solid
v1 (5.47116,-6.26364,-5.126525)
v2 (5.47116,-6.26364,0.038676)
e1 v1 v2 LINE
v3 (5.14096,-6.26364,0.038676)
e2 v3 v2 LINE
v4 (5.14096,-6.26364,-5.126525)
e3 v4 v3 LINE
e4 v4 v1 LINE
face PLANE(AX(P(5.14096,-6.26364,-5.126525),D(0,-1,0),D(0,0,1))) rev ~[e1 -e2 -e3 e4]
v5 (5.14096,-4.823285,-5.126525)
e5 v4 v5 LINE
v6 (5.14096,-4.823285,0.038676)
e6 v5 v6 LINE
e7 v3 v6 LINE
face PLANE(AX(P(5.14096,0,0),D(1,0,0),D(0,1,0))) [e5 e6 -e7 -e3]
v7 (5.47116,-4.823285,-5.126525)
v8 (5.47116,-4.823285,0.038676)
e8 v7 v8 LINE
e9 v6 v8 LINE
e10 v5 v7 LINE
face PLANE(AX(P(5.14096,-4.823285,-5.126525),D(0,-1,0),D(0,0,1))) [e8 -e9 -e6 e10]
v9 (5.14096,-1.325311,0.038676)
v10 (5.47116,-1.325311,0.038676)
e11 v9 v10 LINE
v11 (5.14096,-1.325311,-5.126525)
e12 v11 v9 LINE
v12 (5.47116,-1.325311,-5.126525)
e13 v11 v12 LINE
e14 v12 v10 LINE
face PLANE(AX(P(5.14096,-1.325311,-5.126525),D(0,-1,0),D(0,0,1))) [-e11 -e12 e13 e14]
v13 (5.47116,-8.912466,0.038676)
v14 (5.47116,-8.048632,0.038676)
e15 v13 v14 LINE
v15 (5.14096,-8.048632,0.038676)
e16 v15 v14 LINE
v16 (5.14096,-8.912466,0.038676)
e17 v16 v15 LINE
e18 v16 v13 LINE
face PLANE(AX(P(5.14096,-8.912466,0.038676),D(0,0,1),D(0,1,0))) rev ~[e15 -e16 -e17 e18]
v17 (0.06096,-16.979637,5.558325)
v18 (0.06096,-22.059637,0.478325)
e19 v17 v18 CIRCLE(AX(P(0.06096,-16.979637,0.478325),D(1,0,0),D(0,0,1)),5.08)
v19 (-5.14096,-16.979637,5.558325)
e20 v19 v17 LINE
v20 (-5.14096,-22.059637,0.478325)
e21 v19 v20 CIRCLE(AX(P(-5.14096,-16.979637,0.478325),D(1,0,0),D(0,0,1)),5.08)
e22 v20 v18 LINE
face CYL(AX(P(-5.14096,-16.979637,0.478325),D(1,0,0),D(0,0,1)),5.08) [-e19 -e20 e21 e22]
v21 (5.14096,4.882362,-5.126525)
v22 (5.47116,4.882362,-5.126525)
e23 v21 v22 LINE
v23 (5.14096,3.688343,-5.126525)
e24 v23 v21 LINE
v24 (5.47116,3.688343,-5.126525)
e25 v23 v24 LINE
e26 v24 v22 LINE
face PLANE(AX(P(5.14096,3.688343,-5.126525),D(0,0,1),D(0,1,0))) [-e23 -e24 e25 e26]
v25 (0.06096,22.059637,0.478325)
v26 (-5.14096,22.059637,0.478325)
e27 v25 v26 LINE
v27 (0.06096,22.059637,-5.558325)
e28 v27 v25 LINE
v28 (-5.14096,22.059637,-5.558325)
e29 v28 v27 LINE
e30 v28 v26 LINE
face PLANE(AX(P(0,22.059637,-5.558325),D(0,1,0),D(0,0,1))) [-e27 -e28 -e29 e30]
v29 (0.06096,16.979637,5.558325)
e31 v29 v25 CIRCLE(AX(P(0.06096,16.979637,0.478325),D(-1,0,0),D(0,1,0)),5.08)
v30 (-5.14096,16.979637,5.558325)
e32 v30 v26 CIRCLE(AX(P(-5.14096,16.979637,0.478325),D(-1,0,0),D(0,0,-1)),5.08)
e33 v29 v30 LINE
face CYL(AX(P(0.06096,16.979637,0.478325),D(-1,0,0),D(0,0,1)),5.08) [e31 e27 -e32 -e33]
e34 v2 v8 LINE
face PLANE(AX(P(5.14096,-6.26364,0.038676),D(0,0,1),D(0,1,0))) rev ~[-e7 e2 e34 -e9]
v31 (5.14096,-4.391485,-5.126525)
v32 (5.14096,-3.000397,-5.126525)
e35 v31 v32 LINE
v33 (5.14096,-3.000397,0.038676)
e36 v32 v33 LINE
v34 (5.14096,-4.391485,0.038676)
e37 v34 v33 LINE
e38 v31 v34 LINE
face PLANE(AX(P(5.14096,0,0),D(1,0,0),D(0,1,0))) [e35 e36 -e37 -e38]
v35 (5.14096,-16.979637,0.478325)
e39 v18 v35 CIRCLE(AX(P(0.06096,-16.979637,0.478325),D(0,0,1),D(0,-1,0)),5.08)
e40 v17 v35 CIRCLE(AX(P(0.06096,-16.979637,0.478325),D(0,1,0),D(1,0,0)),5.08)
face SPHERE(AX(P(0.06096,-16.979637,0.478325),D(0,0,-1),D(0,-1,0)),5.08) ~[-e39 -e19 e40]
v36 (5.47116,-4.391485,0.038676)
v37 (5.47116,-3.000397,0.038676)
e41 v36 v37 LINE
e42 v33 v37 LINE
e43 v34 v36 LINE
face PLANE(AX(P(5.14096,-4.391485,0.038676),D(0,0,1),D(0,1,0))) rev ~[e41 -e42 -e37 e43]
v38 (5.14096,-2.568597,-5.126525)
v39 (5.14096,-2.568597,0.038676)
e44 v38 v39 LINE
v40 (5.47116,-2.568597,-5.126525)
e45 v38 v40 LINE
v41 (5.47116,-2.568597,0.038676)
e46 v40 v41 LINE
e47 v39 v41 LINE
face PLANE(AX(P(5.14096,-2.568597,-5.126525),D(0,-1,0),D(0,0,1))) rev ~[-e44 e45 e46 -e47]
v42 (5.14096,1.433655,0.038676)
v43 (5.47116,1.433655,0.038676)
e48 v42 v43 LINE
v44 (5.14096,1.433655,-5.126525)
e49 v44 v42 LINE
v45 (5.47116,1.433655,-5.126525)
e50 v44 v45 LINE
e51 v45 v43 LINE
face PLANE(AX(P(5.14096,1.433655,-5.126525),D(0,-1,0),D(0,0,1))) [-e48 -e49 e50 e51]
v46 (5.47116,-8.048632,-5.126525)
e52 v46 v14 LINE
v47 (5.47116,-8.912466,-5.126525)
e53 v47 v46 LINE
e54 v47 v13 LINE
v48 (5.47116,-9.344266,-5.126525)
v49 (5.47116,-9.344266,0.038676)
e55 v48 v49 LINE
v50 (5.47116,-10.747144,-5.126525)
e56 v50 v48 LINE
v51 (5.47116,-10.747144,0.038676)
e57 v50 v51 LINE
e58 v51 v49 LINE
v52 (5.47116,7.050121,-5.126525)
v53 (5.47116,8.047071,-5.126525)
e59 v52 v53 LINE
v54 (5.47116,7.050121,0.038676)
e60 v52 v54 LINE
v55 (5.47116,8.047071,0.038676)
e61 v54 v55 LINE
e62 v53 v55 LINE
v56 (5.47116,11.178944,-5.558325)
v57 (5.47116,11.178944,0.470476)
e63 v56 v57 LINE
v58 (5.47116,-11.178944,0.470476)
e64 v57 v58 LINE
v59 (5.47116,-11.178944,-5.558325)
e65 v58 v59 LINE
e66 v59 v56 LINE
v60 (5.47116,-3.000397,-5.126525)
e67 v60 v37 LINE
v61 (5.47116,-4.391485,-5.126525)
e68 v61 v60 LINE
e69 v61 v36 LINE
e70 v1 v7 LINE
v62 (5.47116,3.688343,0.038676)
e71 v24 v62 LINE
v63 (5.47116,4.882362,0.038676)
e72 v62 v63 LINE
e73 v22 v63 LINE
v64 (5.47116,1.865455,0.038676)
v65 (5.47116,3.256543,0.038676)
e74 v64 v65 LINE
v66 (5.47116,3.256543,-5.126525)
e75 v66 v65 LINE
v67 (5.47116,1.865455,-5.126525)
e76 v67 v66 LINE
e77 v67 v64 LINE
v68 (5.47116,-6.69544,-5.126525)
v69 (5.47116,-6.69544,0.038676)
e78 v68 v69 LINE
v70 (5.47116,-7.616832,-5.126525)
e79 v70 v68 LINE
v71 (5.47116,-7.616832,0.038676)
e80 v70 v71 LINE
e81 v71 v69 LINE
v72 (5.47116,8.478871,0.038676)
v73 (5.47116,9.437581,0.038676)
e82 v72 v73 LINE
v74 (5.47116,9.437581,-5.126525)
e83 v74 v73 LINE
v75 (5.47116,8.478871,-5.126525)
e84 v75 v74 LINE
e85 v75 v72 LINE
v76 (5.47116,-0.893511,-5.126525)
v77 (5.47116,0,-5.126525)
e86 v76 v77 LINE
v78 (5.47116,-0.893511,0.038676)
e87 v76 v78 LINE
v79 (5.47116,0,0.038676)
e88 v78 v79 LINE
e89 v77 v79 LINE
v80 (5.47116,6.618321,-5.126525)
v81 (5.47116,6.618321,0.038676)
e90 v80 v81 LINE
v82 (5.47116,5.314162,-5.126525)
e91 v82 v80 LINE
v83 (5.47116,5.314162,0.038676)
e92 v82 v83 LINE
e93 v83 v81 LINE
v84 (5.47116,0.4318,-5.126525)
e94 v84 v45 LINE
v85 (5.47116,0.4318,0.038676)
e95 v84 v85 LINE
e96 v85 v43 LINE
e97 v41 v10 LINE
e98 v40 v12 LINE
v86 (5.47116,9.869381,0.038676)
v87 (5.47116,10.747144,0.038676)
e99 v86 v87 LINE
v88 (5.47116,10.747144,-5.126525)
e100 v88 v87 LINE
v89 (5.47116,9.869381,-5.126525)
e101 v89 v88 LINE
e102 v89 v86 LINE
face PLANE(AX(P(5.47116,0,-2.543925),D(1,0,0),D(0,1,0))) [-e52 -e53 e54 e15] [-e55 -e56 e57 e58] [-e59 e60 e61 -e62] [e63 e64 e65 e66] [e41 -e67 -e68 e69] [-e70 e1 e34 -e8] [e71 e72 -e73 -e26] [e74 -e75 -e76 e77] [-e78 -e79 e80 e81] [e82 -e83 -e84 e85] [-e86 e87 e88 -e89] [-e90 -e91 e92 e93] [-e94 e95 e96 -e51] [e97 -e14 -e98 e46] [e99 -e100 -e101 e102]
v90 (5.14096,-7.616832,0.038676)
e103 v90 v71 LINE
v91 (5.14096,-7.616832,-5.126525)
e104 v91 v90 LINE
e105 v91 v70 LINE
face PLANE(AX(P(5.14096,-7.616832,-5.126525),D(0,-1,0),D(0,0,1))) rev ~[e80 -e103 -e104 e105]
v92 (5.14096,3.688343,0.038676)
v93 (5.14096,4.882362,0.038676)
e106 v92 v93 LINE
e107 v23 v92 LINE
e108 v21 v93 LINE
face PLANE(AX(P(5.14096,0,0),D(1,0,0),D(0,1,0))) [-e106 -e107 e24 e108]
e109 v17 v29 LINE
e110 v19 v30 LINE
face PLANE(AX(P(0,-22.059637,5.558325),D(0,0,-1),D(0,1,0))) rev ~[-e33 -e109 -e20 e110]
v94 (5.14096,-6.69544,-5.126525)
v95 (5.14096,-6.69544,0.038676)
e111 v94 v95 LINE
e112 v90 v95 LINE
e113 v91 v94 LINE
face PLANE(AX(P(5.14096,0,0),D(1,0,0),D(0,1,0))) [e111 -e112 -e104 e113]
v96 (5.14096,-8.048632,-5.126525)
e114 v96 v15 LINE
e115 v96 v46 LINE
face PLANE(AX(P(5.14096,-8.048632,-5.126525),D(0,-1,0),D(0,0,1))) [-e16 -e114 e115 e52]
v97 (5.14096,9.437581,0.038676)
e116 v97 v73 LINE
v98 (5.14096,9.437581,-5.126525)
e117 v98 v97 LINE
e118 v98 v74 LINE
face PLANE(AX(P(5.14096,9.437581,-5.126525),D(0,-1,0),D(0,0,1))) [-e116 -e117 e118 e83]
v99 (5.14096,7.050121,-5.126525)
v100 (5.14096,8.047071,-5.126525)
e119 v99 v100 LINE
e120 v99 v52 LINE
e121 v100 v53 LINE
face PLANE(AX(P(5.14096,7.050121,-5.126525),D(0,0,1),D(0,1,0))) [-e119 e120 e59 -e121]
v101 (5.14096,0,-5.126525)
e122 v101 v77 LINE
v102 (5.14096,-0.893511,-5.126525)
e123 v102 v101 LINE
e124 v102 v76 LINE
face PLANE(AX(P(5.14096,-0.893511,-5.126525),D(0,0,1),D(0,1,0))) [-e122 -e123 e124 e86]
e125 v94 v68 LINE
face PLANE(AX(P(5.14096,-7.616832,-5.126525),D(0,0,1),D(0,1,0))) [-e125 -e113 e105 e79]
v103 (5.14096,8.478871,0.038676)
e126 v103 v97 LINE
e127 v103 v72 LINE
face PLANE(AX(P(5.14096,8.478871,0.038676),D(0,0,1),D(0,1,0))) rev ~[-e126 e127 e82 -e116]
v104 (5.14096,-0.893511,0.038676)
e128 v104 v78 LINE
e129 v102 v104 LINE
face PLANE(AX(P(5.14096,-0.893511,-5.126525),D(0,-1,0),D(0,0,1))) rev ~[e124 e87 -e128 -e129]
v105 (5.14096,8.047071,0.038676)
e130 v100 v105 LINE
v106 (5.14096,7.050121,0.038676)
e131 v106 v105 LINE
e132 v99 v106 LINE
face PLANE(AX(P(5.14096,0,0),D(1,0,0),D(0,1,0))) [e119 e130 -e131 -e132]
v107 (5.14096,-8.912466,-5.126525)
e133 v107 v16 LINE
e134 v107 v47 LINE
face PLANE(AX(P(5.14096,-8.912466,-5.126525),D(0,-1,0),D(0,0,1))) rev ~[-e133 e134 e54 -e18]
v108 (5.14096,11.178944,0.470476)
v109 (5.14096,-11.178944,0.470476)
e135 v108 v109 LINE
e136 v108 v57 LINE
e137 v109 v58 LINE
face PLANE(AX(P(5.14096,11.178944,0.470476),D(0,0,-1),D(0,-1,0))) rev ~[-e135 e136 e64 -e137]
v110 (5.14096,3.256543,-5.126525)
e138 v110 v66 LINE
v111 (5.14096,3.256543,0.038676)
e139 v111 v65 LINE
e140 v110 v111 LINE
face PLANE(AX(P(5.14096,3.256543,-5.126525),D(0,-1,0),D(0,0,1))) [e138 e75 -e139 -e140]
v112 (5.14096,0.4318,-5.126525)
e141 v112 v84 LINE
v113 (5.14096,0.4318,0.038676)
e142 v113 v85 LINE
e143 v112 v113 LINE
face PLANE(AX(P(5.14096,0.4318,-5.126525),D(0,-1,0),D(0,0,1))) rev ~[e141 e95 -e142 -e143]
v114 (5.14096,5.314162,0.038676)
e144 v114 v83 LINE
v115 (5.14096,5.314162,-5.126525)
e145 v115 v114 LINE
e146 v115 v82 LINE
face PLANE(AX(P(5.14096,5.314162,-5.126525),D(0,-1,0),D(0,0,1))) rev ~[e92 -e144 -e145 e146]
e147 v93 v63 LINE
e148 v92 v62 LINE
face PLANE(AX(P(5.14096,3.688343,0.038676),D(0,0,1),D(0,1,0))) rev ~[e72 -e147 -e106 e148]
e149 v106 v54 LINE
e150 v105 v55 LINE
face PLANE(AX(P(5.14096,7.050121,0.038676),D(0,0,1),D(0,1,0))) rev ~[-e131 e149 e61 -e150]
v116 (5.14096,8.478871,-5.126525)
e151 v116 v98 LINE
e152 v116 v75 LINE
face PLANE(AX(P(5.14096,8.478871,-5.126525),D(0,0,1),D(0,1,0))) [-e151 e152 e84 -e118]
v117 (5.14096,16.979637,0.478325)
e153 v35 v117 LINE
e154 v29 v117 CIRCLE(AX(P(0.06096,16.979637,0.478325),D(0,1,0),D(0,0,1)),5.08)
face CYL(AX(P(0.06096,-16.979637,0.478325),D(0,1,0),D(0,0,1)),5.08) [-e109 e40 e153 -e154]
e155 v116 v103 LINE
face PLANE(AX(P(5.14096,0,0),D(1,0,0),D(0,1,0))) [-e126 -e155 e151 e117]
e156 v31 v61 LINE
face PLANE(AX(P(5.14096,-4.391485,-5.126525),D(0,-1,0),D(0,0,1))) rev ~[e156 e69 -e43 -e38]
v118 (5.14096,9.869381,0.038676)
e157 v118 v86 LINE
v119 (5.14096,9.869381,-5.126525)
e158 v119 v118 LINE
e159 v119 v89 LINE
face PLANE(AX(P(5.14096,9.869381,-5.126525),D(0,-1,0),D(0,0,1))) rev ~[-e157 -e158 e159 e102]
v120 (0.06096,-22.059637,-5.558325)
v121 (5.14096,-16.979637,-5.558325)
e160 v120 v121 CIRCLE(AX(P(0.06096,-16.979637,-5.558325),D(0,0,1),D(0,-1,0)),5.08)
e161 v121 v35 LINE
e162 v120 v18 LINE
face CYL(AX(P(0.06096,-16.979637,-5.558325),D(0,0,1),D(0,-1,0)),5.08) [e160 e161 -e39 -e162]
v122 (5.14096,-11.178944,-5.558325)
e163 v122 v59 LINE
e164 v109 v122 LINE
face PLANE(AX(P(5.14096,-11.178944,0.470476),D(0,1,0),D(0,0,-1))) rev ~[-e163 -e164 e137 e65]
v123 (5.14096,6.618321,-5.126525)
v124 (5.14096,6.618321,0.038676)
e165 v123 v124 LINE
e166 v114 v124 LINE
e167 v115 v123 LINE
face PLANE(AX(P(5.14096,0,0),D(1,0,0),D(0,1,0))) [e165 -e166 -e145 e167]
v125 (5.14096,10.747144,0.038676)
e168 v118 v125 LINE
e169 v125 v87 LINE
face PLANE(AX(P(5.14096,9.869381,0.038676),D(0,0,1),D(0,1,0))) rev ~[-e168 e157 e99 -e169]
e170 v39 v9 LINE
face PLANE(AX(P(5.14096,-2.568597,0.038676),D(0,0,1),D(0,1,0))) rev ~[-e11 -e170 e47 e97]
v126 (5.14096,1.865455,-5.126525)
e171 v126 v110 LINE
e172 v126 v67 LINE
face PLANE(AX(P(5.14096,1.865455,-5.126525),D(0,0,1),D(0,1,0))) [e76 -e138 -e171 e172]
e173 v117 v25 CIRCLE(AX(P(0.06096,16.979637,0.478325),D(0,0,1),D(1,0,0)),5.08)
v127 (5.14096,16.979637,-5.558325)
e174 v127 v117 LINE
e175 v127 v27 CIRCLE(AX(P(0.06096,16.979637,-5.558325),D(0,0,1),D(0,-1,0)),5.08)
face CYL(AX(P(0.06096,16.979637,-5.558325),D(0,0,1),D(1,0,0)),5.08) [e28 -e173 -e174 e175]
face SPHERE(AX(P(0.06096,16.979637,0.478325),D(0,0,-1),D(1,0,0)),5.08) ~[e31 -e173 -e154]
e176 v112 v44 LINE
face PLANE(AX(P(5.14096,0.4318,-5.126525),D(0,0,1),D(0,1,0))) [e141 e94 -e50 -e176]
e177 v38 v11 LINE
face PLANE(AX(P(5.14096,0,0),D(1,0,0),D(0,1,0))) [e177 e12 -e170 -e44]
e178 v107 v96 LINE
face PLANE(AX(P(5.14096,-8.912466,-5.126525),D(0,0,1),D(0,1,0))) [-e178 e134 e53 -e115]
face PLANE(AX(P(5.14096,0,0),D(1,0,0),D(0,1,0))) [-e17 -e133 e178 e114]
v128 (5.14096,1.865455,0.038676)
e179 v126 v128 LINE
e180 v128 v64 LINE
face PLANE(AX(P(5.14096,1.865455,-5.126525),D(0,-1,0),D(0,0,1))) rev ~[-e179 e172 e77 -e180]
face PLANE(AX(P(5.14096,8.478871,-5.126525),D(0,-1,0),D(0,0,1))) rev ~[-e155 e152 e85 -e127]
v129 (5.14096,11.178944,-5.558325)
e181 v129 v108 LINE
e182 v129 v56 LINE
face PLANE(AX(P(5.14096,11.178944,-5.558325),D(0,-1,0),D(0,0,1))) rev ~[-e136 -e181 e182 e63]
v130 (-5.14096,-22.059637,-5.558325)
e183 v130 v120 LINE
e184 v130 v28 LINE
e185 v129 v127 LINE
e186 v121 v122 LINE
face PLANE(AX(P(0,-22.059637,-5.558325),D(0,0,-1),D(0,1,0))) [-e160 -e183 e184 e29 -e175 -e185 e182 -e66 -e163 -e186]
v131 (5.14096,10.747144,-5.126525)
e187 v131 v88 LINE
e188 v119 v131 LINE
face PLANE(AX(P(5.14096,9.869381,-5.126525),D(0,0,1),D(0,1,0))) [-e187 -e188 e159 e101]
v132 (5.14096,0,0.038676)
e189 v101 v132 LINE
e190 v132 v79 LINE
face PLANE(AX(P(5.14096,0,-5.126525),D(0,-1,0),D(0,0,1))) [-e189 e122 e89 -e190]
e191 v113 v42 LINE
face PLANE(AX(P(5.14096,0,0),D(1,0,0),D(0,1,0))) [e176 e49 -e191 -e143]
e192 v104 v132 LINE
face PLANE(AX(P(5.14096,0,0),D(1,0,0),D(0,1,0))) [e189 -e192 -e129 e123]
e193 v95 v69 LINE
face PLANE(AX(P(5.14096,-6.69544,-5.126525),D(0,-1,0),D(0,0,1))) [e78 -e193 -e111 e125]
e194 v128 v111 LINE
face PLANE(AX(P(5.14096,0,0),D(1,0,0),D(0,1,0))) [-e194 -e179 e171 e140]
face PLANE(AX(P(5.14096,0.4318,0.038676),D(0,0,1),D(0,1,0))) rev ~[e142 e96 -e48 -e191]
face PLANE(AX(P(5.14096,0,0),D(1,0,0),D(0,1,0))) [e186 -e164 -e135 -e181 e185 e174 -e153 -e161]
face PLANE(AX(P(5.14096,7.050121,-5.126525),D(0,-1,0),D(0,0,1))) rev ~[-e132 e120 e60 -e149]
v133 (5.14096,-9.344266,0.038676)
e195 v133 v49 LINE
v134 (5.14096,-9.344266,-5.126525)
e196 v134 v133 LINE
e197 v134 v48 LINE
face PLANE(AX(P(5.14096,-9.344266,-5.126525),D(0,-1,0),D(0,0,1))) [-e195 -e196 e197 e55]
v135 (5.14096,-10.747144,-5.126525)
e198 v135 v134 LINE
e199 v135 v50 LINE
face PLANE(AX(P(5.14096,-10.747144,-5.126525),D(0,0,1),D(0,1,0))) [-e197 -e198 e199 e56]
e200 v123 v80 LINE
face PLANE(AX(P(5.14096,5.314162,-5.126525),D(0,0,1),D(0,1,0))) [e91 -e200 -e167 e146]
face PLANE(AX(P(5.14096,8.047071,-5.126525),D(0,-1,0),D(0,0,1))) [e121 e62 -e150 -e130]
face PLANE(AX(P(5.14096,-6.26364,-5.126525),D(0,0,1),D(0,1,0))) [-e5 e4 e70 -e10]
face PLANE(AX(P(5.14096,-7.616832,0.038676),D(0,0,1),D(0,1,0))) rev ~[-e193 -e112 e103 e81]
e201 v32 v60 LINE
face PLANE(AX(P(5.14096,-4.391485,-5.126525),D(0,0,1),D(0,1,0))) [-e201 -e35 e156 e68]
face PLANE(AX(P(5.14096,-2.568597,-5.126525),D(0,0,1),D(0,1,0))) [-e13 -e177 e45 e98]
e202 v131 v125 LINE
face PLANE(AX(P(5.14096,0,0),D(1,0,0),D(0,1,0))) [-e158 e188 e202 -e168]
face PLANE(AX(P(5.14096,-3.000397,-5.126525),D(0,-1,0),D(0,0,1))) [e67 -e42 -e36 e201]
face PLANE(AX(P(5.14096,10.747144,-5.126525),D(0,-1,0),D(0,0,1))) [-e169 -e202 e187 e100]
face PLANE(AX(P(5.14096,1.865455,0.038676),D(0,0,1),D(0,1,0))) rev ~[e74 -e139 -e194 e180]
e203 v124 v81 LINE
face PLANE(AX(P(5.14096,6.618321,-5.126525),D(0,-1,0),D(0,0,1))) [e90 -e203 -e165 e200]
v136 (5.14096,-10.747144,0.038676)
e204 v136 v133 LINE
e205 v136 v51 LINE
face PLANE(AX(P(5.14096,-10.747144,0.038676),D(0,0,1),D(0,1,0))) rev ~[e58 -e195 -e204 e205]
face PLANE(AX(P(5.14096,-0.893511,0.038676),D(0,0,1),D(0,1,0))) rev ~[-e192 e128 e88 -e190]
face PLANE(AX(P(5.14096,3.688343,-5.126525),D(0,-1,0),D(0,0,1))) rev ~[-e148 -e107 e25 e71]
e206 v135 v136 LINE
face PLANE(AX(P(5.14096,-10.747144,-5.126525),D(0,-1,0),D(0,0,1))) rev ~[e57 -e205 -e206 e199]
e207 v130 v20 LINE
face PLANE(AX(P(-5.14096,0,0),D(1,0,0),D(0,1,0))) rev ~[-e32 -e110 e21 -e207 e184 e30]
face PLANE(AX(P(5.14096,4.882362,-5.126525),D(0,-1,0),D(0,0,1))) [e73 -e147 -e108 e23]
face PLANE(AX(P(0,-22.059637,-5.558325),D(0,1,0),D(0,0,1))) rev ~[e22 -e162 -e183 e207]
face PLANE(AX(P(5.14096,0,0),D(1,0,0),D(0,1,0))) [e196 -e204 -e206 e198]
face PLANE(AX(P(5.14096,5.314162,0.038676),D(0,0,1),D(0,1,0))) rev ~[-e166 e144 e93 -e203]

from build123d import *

# Parameters (mm, degrees)
F0_W     = 44.1192735617
F0_H     = 11.1166509635
F1_DEPTH = 5.14096
F2_R     = 5.08
F3_R     = 5.08
F4_W     = 1.4028784636
F4_H     = 5.165201461
F4_W_2   = 0.8638333529
F4_W_3   = 0.9213921431
F4_W_4   = 1.4403553497
F4_W_5   = 1.3910879198
F4_W_6   = 1.2432860676
F4_W_7   = 0.8935106736
F4_W_8   = 1.0018550383
F4_W_9   = 1.3910882691
F4_W_10  = 1.1940188706
F4_W_11  = 1.3041589975
F4_W_12  = 0.9969494123
F4_W_13  = 0.9587099776
F4_W_14  = 0.8777634058
F5_DEPTH = 0.3302


# Not quite as in the source:
# - a feature names something its author has since deleted; it is built from what else it names


with BuildPart() as f1:
    # F0 (on Right) → F1 (new body, symmetric)
    with BuildSketch(Plane.YZ):
        Rectangle(F0_W, F0_H)
    extrude(amount=F1_DEPTH, both=True)

    # F2
    f2_edges = [f1.edges().sort_by_distance(p)[0] for p in [
        (5.14096, 22.059637, 0),
        (5.14096, -22.059637, 0),
    ]]
    fillet(f2_edges, radius=F2_R)

    # F3
    f3_edges = [f1.edges().sort_by_distance(p)[0] for p in [
        (-2.54, 22.059637, 5.558325),
    ]]
    fillet(f3_edges, radius=F3_R)

    # F4 (on face) → F5 (join)
    with BuildSketch(Plane.YZ.offset(5.14096)):
        Polygon((9.4375805929, -5.5583254817), (11.1789442599, -5.5583254817), (11.1789442599, 0.4704763523), (8.4788706154, 0.4704763523), (7.0501212031, 0.4704763523), (4.8823622055, 0.4704763523), (3.2565433066, 0.4704763523), (1.4336550375, 0.4704763523), (0, 0.4704763523), (-1.3253106736, 0.4704763523), (-3.0003967695, 0.4704763523), (-4.8232846893, 0.4704763523), (-6.695440039, 0.4704763523), (-11.1789442599, 0.4704763523), (-11.1789442599, -5.5583254817), (-8.9124655351, -5.5583254817), (-6.695440039, -5.5583254817), (-4.8232846893, -5.5583254817), (-3.0003967695, -5.5583254817), (-1.3253106736, -5.5583254817), (0, -5.5583254817), (1.4336550375, -5.5583254817), (3.2565433066, -5.5583254817), (4.8823622055, -5.5583254817), (7.0501212031, -5.5583254817), (8.4788706154, -5.5583254817), align=None)
        with Locations((-10.0457047669, -2.5439243782)):
            Rectangle(F4_W, F4_H, mode=Mode.SUBTRACT)
        with Locations((-8.4805488586, -2.5439243782)):
            Rectangle(F4_W_2, F4_H, mode=Mode.SUBTRACT)
        with Locations((-7.1561361106, -2.5439243782)):
            Rectangle(F4_W_3, F4_H, mode=Mode.SUBTRACT)
        with Locations((-5.5434623642, -2.5439243782)):
            Rectangle(F4_W_4, F4_H, mode=Mode.SUBTRACT)
        with Locations((-3.6959407294, -2.5439243782)):
            Rectangle(F4_W_5, F4_H, mode=Mode.SUBTRACT)
        with Locations((-1.9469537074, -2.5439243782)):
            Rectangle(F4_W_6, F4_H, mode=Mode.SUBTRACT)
        with Locations((-0.4467553368, -2.5439243782)):
            Rectangle(F4_W_7, F4_H, mode=Mode.SUBTRACT)
        with Locations((0.9327275184, -2.5439243782)):
            Rectangle(F4_W_8, F4_H, mode=Mode.SUBTRACT)
        with Locations((2.5609991721, -2.5439243782)):
            Rectangle(F4_W_9, F4_H, mode=Mode.SUBTRACT)
        with Locations((4.2853527702, -2.5439243782)):
            Rectangle(F4_W_10, F4_H, mode=Mode.SUBTRACT)
        with Locations((5.9662417043, -2.5439243782)):
            Rectangle(F4_W_11, F4_H, mode=Mode.SUBTRACT)
        with Locations((7.5485959092, -2.5439243782)):
            Rectangle(F4_W_12, F4_H, mode=Mode.SUBTRACT)
        with Locations((8.9582256041, -2.5439243782)):
            Rectangle(F4_W_13, F4_H, mode=Mode.SUBTRACT)
        with Locations((10.3082622958, -2.5439243782)):
            Rectangle(F4_W_14, F4_H, mode=Mode.SUBTRACT)
    extrude(amount=F5_DEPTH)


solid = f1.part
